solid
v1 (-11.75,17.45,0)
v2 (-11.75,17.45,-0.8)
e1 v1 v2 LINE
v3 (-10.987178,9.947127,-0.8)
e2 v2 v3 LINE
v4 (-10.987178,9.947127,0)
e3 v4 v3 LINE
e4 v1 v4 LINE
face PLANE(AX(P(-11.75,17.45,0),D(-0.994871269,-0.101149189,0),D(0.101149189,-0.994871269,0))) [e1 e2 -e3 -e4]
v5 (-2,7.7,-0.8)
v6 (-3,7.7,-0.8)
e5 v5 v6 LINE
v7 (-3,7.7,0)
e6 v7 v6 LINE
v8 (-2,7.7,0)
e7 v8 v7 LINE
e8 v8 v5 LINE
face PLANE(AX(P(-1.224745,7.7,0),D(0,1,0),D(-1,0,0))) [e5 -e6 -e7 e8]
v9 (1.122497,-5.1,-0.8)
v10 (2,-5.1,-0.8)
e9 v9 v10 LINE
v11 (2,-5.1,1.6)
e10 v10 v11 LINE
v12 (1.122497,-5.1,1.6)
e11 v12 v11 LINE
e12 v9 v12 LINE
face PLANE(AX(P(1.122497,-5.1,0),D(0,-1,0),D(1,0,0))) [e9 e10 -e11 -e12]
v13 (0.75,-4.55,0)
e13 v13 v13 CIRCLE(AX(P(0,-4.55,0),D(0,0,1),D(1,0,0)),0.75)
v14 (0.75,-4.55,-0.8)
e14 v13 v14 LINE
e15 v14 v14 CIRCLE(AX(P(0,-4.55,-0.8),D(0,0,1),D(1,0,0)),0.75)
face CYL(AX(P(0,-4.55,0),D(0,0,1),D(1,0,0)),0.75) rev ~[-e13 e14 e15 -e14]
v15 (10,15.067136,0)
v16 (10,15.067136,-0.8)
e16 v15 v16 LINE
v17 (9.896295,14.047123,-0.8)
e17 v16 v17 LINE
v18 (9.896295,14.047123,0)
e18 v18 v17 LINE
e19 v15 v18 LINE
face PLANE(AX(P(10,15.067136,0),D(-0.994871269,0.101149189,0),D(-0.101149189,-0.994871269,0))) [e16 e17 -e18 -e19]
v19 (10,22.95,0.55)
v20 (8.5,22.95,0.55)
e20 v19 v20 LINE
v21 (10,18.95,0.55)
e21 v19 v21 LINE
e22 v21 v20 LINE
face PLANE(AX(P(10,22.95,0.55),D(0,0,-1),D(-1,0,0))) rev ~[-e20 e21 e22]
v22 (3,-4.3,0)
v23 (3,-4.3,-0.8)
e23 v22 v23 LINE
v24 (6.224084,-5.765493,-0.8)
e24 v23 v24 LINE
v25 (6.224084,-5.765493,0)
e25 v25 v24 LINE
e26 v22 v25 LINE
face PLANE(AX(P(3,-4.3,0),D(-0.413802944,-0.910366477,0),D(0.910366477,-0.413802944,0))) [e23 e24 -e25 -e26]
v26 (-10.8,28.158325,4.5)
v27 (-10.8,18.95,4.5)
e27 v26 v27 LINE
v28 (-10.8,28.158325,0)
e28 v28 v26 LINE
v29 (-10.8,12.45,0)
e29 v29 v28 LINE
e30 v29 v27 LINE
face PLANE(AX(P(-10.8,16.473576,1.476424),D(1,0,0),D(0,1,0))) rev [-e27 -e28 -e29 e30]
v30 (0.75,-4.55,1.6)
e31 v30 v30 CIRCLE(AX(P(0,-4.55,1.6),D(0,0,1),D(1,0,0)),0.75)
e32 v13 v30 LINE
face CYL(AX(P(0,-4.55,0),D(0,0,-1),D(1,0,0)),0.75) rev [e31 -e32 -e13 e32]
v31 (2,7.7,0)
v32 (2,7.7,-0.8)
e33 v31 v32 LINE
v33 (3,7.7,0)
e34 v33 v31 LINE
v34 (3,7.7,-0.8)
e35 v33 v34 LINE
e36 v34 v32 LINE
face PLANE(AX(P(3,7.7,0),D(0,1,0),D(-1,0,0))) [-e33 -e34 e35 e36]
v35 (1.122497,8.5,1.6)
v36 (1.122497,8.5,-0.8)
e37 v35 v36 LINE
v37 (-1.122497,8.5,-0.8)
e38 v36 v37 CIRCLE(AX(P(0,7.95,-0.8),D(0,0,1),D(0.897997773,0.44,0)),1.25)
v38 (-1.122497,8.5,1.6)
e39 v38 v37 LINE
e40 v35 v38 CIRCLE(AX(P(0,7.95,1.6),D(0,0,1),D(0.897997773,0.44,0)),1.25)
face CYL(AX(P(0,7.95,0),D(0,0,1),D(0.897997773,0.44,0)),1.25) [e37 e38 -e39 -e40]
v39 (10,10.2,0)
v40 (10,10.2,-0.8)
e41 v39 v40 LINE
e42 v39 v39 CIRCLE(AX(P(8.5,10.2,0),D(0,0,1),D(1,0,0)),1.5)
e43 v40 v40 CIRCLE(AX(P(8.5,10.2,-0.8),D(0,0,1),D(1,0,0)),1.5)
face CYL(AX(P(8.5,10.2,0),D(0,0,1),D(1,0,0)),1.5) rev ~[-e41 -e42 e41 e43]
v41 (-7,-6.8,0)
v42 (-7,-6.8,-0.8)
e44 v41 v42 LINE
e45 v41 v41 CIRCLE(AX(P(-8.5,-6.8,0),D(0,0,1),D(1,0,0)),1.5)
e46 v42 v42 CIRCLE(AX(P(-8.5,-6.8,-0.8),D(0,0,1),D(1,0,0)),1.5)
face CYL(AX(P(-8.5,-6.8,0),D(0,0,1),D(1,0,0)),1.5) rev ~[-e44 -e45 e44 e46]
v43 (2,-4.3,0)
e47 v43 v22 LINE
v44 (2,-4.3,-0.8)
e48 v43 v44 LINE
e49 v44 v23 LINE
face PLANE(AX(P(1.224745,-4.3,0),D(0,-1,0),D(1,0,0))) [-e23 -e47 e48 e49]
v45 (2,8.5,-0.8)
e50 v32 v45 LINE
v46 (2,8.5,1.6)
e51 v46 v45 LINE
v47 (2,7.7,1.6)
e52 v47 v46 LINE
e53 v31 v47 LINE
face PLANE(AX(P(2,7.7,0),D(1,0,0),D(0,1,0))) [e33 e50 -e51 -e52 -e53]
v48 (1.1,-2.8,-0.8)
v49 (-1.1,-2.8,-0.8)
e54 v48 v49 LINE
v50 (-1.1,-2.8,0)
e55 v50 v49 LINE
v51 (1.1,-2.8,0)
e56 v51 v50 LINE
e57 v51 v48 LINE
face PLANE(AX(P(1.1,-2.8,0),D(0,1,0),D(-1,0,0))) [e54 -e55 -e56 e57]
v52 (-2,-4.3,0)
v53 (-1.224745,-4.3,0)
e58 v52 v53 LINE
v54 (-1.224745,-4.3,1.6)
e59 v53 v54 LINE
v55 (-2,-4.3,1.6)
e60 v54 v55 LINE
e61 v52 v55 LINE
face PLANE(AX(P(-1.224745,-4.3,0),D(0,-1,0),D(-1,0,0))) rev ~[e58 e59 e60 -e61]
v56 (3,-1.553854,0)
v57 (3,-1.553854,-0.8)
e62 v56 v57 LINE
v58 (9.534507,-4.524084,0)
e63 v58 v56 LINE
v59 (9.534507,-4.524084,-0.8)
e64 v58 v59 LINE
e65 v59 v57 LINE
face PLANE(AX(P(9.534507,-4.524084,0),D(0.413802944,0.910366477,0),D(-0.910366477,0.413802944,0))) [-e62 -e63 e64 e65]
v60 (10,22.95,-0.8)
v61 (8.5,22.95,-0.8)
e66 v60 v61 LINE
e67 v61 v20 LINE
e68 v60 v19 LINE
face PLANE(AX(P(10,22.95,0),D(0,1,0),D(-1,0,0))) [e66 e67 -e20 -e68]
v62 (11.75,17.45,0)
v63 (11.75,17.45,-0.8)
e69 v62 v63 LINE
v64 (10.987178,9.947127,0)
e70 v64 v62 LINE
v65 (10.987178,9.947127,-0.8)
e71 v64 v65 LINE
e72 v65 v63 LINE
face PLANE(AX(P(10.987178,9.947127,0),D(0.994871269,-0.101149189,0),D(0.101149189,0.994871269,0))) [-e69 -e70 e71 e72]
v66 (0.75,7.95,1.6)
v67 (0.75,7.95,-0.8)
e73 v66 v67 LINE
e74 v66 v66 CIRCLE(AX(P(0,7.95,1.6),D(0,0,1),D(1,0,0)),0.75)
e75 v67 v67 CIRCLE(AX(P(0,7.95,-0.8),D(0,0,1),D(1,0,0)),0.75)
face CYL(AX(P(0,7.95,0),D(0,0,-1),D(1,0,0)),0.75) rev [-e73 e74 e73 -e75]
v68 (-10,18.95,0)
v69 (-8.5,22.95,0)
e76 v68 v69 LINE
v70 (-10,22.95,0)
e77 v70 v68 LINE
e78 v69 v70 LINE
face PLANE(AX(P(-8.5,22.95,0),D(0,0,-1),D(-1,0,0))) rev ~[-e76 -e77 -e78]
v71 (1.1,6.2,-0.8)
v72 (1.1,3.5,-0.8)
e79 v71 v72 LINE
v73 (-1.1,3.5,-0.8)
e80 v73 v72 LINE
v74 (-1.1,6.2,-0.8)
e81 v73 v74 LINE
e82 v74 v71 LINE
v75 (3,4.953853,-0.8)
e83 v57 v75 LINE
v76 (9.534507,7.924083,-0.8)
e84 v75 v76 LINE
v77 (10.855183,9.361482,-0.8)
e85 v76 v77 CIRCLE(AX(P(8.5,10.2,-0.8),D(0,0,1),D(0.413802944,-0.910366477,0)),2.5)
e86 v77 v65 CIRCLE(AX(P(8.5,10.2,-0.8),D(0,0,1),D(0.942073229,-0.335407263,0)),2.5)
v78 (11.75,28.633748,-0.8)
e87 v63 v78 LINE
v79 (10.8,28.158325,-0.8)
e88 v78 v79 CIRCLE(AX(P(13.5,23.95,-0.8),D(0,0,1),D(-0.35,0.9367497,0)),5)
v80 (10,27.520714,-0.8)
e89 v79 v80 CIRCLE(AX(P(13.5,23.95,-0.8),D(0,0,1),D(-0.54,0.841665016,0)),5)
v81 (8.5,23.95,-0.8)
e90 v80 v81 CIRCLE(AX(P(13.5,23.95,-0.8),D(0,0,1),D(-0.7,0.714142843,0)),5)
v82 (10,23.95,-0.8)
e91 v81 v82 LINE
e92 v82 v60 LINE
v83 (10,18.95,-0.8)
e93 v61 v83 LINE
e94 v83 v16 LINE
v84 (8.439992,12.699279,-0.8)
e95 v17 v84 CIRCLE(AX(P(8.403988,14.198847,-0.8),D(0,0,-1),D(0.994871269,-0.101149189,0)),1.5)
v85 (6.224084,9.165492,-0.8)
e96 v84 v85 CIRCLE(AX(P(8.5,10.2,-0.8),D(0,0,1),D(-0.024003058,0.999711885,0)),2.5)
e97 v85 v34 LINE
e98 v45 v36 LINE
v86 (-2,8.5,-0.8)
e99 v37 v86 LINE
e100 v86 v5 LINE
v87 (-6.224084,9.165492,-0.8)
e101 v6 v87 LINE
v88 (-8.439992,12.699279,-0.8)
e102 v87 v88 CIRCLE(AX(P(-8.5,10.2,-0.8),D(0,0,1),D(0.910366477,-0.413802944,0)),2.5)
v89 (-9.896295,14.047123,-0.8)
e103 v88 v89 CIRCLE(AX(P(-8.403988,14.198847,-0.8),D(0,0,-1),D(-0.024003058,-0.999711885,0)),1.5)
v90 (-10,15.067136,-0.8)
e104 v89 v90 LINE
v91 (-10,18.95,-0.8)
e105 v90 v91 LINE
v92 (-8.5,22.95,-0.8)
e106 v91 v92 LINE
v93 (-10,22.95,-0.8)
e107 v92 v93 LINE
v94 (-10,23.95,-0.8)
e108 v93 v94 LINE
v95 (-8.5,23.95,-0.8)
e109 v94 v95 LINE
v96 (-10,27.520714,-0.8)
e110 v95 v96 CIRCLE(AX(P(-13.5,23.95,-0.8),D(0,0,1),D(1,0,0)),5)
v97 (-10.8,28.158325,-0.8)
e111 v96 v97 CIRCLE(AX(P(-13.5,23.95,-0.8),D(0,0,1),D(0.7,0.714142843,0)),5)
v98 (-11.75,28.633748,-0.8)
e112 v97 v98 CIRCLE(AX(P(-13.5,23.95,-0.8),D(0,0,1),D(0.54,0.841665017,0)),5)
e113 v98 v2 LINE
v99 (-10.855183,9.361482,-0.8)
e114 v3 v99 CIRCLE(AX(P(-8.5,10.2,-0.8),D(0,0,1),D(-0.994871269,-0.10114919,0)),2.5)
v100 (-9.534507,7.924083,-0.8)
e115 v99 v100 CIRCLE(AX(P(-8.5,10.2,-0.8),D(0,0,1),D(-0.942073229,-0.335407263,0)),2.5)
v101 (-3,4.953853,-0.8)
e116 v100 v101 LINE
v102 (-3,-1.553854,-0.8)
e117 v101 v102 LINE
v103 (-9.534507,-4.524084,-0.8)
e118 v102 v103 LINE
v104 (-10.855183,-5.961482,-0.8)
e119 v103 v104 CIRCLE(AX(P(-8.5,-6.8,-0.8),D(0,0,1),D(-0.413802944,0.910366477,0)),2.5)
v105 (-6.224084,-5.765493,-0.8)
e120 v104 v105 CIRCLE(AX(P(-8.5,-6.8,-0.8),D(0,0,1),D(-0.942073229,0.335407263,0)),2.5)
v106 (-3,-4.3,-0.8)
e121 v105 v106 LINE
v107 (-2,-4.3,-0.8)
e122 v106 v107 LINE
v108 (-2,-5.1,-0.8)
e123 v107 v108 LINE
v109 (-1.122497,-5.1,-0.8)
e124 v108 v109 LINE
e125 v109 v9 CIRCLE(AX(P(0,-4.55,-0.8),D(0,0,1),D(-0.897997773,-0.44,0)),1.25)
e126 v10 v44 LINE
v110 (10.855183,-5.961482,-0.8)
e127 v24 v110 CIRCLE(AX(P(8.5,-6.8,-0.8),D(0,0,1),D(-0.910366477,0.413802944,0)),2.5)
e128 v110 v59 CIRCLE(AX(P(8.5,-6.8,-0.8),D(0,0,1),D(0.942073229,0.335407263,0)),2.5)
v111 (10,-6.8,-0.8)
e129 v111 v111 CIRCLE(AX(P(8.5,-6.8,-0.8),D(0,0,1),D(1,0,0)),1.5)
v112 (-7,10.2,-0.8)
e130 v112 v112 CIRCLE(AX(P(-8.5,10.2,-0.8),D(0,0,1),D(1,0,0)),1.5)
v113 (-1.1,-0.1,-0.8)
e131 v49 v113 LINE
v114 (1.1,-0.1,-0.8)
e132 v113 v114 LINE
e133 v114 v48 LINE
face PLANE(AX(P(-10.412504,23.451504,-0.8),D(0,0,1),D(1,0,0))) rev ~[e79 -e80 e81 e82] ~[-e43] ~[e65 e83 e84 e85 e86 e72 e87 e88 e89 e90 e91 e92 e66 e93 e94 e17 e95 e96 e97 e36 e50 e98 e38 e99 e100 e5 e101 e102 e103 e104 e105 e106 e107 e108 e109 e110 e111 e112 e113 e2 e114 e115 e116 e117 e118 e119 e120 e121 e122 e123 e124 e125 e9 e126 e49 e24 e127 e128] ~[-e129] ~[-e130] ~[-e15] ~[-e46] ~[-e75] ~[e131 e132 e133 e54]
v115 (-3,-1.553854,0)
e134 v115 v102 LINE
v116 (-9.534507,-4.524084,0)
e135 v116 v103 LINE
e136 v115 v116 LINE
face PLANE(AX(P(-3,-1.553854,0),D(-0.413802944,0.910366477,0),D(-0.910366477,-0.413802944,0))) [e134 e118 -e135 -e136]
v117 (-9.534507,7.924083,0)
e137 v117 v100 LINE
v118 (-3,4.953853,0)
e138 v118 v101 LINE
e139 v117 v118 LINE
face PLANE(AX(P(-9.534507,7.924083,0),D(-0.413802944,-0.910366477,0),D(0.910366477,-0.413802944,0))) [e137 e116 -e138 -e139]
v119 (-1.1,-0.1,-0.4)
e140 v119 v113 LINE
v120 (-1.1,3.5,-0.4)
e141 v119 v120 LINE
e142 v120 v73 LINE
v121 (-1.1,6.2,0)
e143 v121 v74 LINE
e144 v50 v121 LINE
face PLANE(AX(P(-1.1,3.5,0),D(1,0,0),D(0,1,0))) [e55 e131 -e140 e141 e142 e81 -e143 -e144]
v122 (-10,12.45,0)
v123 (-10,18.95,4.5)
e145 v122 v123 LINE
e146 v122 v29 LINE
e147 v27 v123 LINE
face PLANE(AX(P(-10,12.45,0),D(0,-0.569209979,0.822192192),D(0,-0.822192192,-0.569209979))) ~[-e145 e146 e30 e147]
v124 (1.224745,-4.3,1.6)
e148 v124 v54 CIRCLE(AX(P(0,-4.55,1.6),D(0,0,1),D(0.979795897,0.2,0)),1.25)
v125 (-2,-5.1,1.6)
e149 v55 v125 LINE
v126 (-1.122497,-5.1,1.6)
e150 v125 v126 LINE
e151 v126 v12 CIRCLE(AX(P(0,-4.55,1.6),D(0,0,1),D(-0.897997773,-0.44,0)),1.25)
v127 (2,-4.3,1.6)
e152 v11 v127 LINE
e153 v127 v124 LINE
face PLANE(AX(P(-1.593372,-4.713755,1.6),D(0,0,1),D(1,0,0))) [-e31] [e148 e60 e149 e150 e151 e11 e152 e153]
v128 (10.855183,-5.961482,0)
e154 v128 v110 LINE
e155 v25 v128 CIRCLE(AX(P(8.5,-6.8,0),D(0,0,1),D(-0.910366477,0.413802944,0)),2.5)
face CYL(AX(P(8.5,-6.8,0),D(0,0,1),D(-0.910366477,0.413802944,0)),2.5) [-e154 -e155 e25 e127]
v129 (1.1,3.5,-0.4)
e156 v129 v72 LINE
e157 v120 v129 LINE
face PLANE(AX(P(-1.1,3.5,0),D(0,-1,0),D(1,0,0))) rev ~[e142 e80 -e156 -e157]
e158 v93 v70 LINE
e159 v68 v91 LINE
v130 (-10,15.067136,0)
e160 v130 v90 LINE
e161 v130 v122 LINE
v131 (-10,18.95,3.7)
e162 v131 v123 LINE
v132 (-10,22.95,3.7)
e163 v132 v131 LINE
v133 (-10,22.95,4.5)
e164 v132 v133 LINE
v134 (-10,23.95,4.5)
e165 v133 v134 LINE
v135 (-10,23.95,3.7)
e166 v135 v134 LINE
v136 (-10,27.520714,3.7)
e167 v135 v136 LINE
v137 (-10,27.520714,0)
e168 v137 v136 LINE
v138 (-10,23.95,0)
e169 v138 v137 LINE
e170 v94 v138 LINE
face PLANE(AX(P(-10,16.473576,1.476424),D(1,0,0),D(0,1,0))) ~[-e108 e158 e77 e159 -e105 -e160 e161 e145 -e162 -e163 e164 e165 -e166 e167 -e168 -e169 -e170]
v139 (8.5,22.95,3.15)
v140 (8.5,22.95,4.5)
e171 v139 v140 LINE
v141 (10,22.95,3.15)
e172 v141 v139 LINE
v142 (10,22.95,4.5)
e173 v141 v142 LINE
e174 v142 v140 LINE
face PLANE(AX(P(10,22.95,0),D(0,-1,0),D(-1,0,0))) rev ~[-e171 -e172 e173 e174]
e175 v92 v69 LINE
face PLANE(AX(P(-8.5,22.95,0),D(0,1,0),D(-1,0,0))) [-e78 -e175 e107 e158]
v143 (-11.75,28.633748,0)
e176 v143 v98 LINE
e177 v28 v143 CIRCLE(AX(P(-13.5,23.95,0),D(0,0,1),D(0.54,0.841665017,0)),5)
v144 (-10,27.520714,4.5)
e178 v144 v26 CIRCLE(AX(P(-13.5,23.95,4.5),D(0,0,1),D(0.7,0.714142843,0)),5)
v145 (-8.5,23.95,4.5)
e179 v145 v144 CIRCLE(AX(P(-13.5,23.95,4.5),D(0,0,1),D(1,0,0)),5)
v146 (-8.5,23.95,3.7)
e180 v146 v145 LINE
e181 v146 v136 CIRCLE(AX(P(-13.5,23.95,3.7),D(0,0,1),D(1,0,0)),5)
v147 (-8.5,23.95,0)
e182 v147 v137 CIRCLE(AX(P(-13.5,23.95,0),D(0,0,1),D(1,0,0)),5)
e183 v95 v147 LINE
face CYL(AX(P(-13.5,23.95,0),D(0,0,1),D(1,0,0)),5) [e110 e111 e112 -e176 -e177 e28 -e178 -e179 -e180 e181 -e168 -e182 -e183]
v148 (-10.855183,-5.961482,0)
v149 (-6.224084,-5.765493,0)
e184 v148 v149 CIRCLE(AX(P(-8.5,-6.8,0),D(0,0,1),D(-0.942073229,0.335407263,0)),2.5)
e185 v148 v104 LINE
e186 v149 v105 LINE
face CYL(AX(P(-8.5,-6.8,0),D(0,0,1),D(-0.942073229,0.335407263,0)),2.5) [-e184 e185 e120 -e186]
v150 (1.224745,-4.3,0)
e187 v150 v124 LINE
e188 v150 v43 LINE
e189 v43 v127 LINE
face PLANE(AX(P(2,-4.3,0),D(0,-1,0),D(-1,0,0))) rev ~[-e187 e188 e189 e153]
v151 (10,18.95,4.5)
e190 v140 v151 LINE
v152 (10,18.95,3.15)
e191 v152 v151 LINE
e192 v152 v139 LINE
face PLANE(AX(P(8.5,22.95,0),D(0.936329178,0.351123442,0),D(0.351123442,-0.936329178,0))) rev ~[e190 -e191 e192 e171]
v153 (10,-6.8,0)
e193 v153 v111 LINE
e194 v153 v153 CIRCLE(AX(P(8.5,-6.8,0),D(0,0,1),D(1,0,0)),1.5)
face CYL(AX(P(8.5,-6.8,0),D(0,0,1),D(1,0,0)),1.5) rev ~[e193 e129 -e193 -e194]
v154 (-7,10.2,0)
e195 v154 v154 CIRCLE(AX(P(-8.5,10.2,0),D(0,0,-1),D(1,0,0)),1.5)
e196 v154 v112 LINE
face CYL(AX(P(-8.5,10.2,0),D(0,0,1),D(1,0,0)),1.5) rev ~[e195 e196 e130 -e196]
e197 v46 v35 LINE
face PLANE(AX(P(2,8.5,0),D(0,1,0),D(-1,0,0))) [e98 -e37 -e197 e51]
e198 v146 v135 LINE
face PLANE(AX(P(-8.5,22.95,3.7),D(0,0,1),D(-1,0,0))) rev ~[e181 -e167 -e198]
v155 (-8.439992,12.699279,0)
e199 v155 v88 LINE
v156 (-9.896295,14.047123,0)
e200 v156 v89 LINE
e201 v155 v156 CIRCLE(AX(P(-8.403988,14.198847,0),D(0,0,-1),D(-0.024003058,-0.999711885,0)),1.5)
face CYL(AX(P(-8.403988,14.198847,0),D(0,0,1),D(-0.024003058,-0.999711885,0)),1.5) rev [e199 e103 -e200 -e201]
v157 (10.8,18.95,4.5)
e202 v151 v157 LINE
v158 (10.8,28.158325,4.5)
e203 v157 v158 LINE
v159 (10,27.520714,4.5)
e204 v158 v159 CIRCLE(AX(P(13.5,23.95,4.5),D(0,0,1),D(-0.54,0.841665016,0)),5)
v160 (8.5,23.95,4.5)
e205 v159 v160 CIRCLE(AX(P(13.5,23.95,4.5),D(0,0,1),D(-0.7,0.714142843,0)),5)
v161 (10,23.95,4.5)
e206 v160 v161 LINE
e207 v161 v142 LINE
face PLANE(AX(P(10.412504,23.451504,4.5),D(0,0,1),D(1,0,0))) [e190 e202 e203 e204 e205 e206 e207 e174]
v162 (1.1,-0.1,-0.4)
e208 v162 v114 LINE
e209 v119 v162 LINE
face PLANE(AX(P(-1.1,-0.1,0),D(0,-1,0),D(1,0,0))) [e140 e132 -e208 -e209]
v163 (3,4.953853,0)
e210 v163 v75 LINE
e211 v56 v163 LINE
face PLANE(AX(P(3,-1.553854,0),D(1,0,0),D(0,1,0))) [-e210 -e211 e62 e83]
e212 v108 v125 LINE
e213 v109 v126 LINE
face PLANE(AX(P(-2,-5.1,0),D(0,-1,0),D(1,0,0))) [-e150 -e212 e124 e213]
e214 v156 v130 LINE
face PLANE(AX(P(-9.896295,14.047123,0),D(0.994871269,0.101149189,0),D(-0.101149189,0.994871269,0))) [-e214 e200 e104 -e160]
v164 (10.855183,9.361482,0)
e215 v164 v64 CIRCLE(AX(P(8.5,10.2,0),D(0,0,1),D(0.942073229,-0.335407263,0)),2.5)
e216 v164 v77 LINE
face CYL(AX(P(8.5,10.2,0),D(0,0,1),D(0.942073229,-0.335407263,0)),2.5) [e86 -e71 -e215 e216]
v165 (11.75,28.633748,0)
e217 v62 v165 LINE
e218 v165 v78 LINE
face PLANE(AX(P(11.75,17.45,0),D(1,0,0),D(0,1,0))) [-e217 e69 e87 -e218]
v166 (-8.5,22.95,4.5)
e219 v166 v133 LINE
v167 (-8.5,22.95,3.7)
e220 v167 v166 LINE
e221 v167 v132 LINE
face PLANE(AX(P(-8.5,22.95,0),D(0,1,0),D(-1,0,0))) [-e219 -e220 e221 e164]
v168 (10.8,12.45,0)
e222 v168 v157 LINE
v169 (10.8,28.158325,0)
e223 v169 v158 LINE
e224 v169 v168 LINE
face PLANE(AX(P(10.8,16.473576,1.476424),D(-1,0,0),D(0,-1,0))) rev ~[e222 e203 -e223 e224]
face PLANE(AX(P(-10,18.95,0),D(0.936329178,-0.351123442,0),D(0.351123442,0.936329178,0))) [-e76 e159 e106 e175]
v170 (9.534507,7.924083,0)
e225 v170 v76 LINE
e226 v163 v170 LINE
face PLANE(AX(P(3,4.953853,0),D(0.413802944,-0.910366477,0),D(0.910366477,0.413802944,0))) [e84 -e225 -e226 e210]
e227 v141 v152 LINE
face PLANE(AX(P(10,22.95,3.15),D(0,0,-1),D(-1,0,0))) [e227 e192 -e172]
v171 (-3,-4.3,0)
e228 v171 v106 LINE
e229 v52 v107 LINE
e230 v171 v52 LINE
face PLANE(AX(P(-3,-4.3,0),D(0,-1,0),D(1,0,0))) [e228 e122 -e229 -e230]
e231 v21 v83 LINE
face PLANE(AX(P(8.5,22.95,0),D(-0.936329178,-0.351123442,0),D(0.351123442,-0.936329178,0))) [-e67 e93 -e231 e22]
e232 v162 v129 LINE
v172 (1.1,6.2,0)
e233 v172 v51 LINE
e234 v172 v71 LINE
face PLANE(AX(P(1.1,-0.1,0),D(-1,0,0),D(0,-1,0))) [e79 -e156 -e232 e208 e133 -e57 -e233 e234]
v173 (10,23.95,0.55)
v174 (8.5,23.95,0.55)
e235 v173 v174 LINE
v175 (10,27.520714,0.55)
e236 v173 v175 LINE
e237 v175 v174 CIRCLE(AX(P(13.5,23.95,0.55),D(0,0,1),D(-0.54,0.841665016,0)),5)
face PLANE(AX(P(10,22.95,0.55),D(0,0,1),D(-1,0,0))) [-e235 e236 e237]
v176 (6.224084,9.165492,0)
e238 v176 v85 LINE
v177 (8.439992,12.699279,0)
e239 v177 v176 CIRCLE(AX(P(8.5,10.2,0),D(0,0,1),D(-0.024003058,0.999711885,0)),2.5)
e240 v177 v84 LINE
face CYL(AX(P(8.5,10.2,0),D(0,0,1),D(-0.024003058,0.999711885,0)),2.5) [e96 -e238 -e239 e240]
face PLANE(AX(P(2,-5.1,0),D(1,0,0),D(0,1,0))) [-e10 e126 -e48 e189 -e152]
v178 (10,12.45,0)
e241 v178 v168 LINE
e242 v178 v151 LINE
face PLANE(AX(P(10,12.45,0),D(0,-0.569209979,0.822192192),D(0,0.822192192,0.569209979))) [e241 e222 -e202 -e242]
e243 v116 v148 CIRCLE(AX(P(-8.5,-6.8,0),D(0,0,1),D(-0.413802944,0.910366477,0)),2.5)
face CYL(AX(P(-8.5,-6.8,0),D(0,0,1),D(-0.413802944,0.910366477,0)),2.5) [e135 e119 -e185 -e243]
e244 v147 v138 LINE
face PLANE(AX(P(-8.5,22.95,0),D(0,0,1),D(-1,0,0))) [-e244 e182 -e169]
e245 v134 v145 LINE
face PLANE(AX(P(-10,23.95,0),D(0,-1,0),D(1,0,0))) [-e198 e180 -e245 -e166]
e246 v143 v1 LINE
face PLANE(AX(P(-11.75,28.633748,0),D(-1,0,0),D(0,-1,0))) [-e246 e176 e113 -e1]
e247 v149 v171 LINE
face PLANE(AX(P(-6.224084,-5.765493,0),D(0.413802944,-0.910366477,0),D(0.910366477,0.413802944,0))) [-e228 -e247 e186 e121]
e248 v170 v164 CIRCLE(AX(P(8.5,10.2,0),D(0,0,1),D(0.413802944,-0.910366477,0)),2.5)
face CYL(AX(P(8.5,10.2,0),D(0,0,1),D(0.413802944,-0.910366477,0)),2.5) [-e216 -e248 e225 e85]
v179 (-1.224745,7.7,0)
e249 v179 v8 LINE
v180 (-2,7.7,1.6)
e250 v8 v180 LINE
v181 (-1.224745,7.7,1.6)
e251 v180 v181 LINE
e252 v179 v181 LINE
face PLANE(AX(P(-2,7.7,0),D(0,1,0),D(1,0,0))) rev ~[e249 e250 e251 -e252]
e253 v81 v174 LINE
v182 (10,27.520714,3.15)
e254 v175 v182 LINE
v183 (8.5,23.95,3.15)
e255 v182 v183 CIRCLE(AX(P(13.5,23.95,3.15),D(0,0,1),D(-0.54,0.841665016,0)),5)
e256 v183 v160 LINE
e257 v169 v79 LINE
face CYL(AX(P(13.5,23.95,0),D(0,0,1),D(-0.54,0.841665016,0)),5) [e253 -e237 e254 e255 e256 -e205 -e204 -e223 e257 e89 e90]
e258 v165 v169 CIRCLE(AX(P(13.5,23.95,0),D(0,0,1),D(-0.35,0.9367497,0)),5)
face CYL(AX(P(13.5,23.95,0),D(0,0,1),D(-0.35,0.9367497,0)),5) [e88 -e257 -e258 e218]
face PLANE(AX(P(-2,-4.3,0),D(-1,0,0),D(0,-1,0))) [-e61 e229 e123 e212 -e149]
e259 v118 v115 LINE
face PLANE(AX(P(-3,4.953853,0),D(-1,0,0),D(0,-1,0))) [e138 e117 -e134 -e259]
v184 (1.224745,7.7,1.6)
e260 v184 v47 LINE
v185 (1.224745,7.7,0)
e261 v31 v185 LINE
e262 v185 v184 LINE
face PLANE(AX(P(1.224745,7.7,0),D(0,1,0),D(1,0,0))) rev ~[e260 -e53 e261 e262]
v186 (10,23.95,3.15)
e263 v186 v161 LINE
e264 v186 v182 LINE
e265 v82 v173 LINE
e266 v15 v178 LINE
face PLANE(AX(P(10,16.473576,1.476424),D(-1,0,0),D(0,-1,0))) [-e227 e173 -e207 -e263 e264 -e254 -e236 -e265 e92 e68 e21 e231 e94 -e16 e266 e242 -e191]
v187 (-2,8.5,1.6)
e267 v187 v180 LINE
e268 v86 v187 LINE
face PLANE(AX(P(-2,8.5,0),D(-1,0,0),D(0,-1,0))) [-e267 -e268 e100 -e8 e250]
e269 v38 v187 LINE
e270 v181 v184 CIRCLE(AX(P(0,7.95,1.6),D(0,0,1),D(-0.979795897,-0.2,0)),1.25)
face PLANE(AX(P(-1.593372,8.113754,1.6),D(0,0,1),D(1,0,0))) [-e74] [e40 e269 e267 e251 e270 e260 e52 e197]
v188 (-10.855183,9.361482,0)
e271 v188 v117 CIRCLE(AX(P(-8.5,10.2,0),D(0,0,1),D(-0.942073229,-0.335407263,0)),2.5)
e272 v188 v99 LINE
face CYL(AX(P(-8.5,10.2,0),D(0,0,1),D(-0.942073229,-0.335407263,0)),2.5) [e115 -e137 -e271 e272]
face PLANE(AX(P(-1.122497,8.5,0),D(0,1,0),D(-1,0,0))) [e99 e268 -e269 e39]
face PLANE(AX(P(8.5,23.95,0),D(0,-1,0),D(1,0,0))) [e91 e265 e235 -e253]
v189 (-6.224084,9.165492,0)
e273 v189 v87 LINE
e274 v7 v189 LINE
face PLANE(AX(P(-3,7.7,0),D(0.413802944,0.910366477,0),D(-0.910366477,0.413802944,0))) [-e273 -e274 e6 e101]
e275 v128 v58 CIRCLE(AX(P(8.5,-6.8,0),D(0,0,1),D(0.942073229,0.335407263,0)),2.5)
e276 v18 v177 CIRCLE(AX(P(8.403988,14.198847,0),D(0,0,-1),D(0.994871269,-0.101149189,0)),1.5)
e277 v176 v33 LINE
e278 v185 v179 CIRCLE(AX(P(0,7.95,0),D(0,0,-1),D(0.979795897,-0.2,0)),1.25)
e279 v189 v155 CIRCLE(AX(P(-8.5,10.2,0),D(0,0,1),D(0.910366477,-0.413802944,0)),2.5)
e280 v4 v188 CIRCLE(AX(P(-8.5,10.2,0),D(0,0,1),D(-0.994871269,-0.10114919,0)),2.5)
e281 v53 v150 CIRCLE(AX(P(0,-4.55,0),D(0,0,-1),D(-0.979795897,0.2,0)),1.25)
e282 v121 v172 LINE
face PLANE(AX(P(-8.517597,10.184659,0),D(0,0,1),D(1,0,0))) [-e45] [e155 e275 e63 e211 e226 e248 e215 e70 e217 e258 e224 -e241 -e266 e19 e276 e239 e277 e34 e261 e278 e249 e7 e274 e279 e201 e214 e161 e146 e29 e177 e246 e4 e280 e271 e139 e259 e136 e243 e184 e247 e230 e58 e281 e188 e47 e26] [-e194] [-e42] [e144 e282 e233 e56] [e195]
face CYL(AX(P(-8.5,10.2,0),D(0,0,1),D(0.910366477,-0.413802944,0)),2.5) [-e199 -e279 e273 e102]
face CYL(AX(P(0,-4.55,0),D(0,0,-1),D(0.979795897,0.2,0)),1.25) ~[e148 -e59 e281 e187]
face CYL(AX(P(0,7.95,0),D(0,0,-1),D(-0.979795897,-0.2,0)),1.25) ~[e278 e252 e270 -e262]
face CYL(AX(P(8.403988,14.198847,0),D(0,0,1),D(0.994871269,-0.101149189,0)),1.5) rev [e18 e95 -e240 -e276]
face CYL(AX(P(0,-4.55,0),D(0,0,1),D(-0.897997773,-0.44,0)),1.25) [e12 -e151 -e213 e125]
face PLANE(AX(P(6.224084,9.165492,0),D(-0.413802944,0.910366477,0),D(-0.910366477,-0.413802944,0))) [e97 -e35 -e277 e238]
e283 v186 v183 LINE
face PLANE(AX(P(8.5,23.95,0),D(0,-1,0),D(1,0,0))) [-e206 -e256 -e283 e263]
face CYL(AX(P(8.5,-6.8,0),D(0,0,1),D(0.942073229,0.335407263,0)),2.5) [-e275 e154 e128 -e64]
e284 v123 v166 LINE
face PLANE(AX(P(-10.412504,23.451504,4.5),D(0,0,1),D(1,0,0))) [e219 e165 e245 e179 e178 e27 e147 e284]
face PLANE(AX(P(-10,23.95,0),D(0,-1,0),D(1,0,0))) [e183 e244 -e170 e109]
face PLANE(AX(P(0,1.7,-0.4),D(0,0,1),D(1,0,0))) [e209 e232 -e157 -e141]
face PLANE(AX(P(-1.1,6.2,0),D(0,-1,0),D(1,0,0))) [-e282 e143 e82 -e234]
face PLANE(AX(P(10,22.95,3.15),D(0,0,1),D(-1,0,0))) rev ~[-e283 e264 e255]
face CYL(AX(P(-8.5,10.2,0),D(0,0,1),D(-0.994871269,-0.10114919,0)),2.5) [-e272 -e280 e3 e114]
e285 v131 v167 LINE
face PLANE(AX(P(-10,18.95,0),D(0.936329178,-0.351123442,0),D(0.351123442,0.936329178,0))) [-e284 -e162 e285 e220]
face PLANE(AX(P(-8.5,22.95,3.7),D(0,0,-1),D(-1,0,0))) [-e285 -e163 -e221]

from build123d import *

# Parameters (mm, degrees)
F0_W          = 2.2
F0_H          = 3.6
F1_DEPTH      = 0.8
F0_R          = 0.75
F2_DEPTH      = 1.6
F2_DEPTH_BACK = 0.8
F3_DEPTH      = 0.4
F0_R_2        = 1.5
F4_DEPTH      = 0.8
F5_DEPTH      = 4.5
F5_DEPTH_BACK = 0.8
F6_W          = 1.5
F6_H          = 3.7
F6_H_2        = 2.6
F7_DEPTH      = 25
F7_DEPTH_BACK = 25
F9_DEPTH      = 0.8


# Not quite as in the source:
# - a feature of the source that left no trace in its solid (it failed there, or was rolled back) is left out
# - a pattern or mirror of a feature is missing from the dataset's text; its kind, count and spacing are read off the source's solid


with BuildPart() as f1:
    # F0 (on Top) → F1 (new body)
    with BuildSketch(Plane.XY):
        with BuildLine():
            Line((2, 7.6999996733), (1.2247448714, 7.6999996733))
            ThreePointArc((1.2247448714, 7.6999996733), (0, 6.6999996733), (-1.2247448714, 7.6999996733))
            Line((-1.2247448714, 7.6999996733), (-2, 7.6999996733))
            Line((-2, 7.6999996733), (-3, 7.6999996733))
            Line((-3, 7.6999996733), (-6.2240838063, 9.1654923125))
            ThreePointArc((-6.2240838063, 9.1654923125), (-7.622191396, 7.8591767294), (-9.5345073608, 7.9240834796))
            Line((-9.5345073608, 7.9240834796), (-3, 4.9538528611))
            Line((-3, 4.9538528611), (-3, -1.5538535145))
            Line((-3, -1.5538535145), (-9.5345073608, -4.5240841331))
            ThreePointArc((-9.5345073608, -4.5240841331), (-7.622191396, -4.4591773828), (-6.2240838063, -5.765492966))
            Line((-6.2240838063, -5.765492966), (-3, -4.3000003267))
            Line((-3, -4.3000003267), (-2, -4.3000003267))
            Line((-2, -4.3000003267), (-1.2247448714, -4.3000003267))
            ThreePointArc((-1.2247448714, -4.3000003267), (0, -3.3000003267), (1.2247448714, -4.3000003267))
            Line((1.2247448714, -4.3000003267), (2, -4.3000003267))
            Line((2, -4.3000003267), (3, -4.3000003267))
            Line((3, -4.3000003267), (6.2240838063, -5.765492966))
            ThreePointArc((6.2240838063, -5.765492966), (7.622191396, -4.4591773828), (9.5345073608, -4.5240841331))
            Line((9.5345073608, -4.5240841331), (3, -1.5538535145))
            Line((3, -1.5538535145), (3, 4.9538528611))
            Line((3, 4.9538528611), (9.5345073608, 7.9240834796))
            ThreePointArc((9.5345073608, 7.9240834796), (7.622191396, 7.8591767294), (6.2240838063, 9.1654923125))
            Line((6.2240838063, 9.1654923125), (3, 7.6999996733))
            Line((3, 7.6999996733), (2, 7.6999996733))
        make_face()
        Polygon((-1.1, 3.4999996733), (-1.1, 6.1999996733), (1.1, 6.1999996733), (1.1, 3.4999996733), (1.1, -0.1000003267), (1.1, -2.8000003267), (-1.1, -2.8000003267), (-1.1, -0.1000003267), align=None, mode=Mode.SUBTRACT)
        with Locations((0, 1.6999996733)):
            Rectangle(F0_W, F0_H)
    extrude(amount=-F1_DEPTH)

    # F0 (on Top) → F2 (join, two sides)
    with BuildSketch(Plane.XY) as f2_sk:
        with BuildLine():
            ThreePointArc((-1.2247448714, 7.6999996733), (-1.2399138495, 8.1084725282), (-1.122497216, 8.4999996733))
            Line((-1.122497216, 8.4999996733), (-2, 8.4999996733))
            Line((-2, 8.4999996733), (-2, 7.6999996733))
            Line((-2, 7.6999996733), (-1.2247448714, 7.6999996733))
        make_face()
        with BuildLine():
            ThreePointArc((1.2247448714, 7.6999996733), (1.2436701913, 7.8243634708), (1.25, 7.9499996733))
            ThreePointArc((1.25, 7.9499996733), (1.2177071733, 8.2322924999), (1.122497216, 8.4999996733))
            ThreePointArc((1.122497216, 8.4999996733), (0, 9.1999996733), (-1.122497216, 8.4999996733))
            ThreePointArc((-1.122497216, 8.4999996733), (-1.2399138495, 8.1084725282), (-1.2247448714, 7.6999996733))
            ThreePointArc((-1.2247448714, 7.6999996733), (0, 6.6999996733), (1.2247448714, 7.6999996733))
        make_face()
        with Locations((0, 7.9499996733)):
            Circle(F0_R, mode=Mode.SUBTRACT)
        with BuildLine():
            ThreePointArc((1.122497216, 8.4999996733), (1.2177071733, 8.2322924999), (1.25, 7.9499996733))
            ThreePointArc((1.25, 7.9499996733), (1.2436701913, 7.8243634708), (1.2247448714, 7.6999996733))
            Line((1.2247448714, 7.6999996733), (2, 7.6999996733))
            Line((2, 7.6999996733), (2, 8.4999996733))
            Line((2, 8.4999996733), (1.122497216, 8.4999996733))
        make_face()
        with BuildLine():
            Line((-1.2247448714, -4.3000003267), (-2, -4.3000003267))
            Line((-2, -4.3000003267), (-2, -5.1000003267))
            Line((-2, -5.1000003267), (-1.122497216, -5.1000003267))
            ThreePointArc((-1.122497216, -5.1000003267), (-1.2399138495, -4.7084731817), (-1.2247448714, -4.3000003267))
        make_face()
        with BuildLine():
            ThreePointArc((1.25, -4.5500003267), (1.2436701913, -4.4243641242), (1.2247448714, -4.3000003267))
            ThreePointArc((1.2247448714, -4.3000003267), (0, -3.3000003267), (-1.2247448714, -4.3000003267))
            ThreePointArc((-1.2247448714, -4.3000003267), (-1.2399138495, -4.7084731817), (-1.122497216, -5.1000003267))
            ThreePointArc((-1.122497216, -5.1000003267), (0, -5.8000003267), (1.122497216, -5.1000003267))
            ThreePointArc((1.122497216, -5.1000003267), (1.2177071733, -4.8322931534), (1.25, -4.5500003267))
        make_face()
        with Locations((0, -4.5500003267)):
            Circle(F0_R, mode=Mode.SUBTRACT)
        with BuildLine():
            Line((2, -5.1000003267), (2, -4.3000003267))
            Line((2, -4.3000003267), (1.2247448714, -4.3000003267))
            ThreePointArc((1.2247448714, -4.3000003267), (1.2436701913, -4.4243641242), (1.25, -4.5500003267))
            ThreePointArc((1.25, -4.5500003267), (1.2177071733, -4.8322931534), (1.122497216, -5.1000003267))
            Line((1.122497216, -5.1000003267), (2, -5.1000003267))
        make_face()
    extrude(amount=F2_DEPTH)
    extrude(f2_sk.sketch, amount=-F2_DEPTH_BACK)

    # F0 (on Top) → F3 (cut)
    with BuildSketch(Plane.XY):
        with Locations((0, 1.6999996733)):
            Rectangle(F0_W, F0_H)
    extrude(amount=-F3_DEPTH, mode=Mode.SUBTRACT)

    # F0 (on Top) → F4 (join)
    with BuildSketch(Plane.XY):
        with BuildLine():
            ThreePointArc((-9.5345073608, 7.9240834796), (-7.622191396, 7.8591767294), (-6.2240838063, 9.1654923125))
            ThreePointArc((-6.2240838063, 9.1654923125), (-6.3819707707, 11.5281382895), (-8.4399923541, 12.699279386))
            ThreePointArc((-8.4399923541, 12.699279386), (-10.3347684576, 11.8981235519), (-10.987178172, 9.9471266996))
            ThreePointArc((-10.987178172, 9.9471266996), (-10.9388236249, 9.6503276559), (-10.8551830715, 9.3614815161))
            ThreePointArc((-10.8551830715, 9.3614815161), (-10.3409314451, 8.5085590404), (-9.5345073608, 7.9240834796))
        make_face()
        with Locations((-8.5, 10.1999996733)):
            Circle(F0_R_2, mode=Mode.SUBTRACT)
        with BuildLine():
            ThreePointArc((8.4399923541, 12.699279386), (6.3819707707, 11.5281382895), (6.2240838063, 9.1654923125))
            ThreePointArc((6.2240838063, 9.1654923125), (7.622191396, 7.8591767294), (9.5345073608, 7.9240834796))
            ThreePointArc((9.5345073608, 7.9240834796), (10.3409314451, 8.5085590404), (10.8551830715, 9.3614815161))
            ThreePointArc((10.8551830715, 9.3614815161), (10.9388236249, 9.6503276559), (10.987178172, 9.9471266996))
            ThreePointArc((10.987178172, 9.9471266996), (10.3347684576, 11.8981235519), (8.4399923541, 12.699279386))
        make_face()
        with Locations((8.5, 10.1999996733)):
            Circle(F0_R_2, mode=Mode.SUBTRACT)
        with BuildLine():
            ThreePointArc((-6.2240838063, -5.765492966), (-7.622191396, -4.4591773828), (-9.5345073608, -4.5240841331))
            ThreePointArc((-9.5345073608, -4.5240841331), (-10.3409314451, -5.1085596938), (-10.8551830715, -5.9614821695))
            ThreePointArc((-10.8551830715, -5.9614821695), (-8.394294033, -9.2977645767), (-6.2240838063, -5.765492966))
        make_face()
        with Locations((-8.5, -6.8000003267)):
            Circle(F0_R_2, mode=Mode.SUBTRACT)
        with BuildLine():
            ThreePointArc((10.8551830715, -5.9614821695), (10.3409314451, -5.1085596938), (9.5345073608, -4.5240841331))
            ThreePointArc((9.5345073608, -4.5240841331), (7.622191396, -4.4591773828), (6.2240838063, -5.765492966))
            ThreePointArc((6.2240838063, -5.765492966), (8.394294033, -9.2977645767), (10.8551830715, -5.9614821695))
        make_face()
        with Locations((8.5, -6.8000003267)):
            Circle(F0_R_2, mode=Mode.SUBTRACT)
        with BuildLine():
            ThreePointArc((-10.987178172, 9.9471266996), (-10.3347684576, 11.8981235519), (-8.4399923541, 12.699279386))
            ThreePointArc((-8.4399923541, 12.699279386), (-9.4228620937, 13.0979861391), (-9.8962946697, 14.0471234295))
            Line((-9.8962946697, 14.0471234295), (-10, 15.0671360866))
            Line((-10, 15.0671360866), (-10, 18.9499996733))
            Line((-10, 18.9499996733), (-10.8, 18.9499996733))
            Line((-10.8, 18.9499996733), (-10.8, 28.1583247558))
            ThreePointArc((-10.8, 28.1583247558), (-11.2623378592, 28.4213381914), (-11.75, 28.6337481721))
            Line((-11.75, 28.6337481721), (-11.75, 17.4499996733))
            Line((-11.75, 17.4499996733), (-10.987178172, 9.9471266996))
        make_face()
        with BuildLine():
            ThreePointArc((9.8962946697, 14.0471234295), (9.4228620937, 13.0979861391), (8.4399923541, 12.699279386))
            ThreePointArc((8.4399923541, 12.699279386), (10.3347684576, 11.8981235519), (10.987178172, 9.9471266996))
            Line((10.987178172, 9.9471266996), (11.75, 17.4499996733))
            Line((11.75, 17.4499996733), (11.75, 28.6337481721))
            ThreePointArc((11.75, 28.6337481721), (11.2623378592, 28.4213381914), (10.8, 28.1583247558))
            Line((10.8, 28.1583247558), (10.8, 18.9499996733))
            Line((10.8, 18.9499996733), (10, 18.9499996733))
            Line((10, 18.9499996733), (10, 15.0671360866))
            Line((10, 15.0671360866), (9.8962946697, 14.0471234295))
        make_face()
    extrude(amount=-F4_DEPTH)

    # F0 (on Top) → F5 (join, two sides)
    with BuildSketch(Plane.XY) as f5_sk:
        with BuildLine():
            Line((-10.8, 18.9499996733), (-10, 18.9499996733))
            Line((-10, 18.9499996733), (-10, 22.9499996733))
            Line((-10, 22.9499996733), (-10, 23.9499996733))
            Line((-10, 23.9499996733), (-10, 27.5207138876))
            ThreePointArc((-10, 27.5207138876), (-10.383650067, 27.860033317), (-10.8, 28.1583247558))
            Line((-10.8, 28.1583247558), (-10.8, 18.9499996733))
        make_face()
        Polygon((-10, 22.9499996733), (-10, 18.9499996733), (-8.5, 22.9499996733), align=None)
        with BuildLine():
            ThreePointArc((-8.5, 23.9499996733), (-8.8902277714, 25.8864913464), (-10, 27.5207138876))
            Line((-10, 27.5207138876), (-10, 23.9499996733))
            Line((-10, 23.9499996733), (-8.5, 23.9499996733))
        make_face()
        with BuildLine():
            Line((10, 22.9499996733), (10, 18.9499996733))
            Line((10, 18.9499996733), (10.8, 18.9499996733))
            Line((10.8, 18.9499996733), (10.8, 28.1583247558))
            ThreePointArc((10.8, 28.1583247558), (10.383650067, 27.860033317), (10, 27.5207138876))
            Line((10, 27.5207138876), (10, 23.9499996733))
            Line((10, 23.9499996733), (10, 22.9499996733))
        make_face()
        Polygon((8.5, 22.9499996733), (10, 18.9499996733), (10, 22.9499996733), align=None)
        with BuildLine():
            Line((10, 23.9499996733), (10, 27.5207138876))
            ThreePointArc((10, 27.5207138876), (8.8902277714, 25.8864913464), (8.5, 23.9499996733))
            Line((8.5, 23.9499996733), (10, 23.9499996733))
        make_face()
    extrude(amount=F5_DEPTH)
    extrude(f5_sk.sketch, amount=-F5_DEPTH_BACK)

    # F6 (on face) → F7 (cut, two sides)
    with BuildSketch(Plane(origin=(0, 22.9499996733, 0), x_dir=(-1, 0, 0), z_dir=(0, 1, 0))) as f7_sk:
        with Locations((9.25, 1.85)):
            Rectangle(F6_W, F6_H)
        with Locations((-9.25, 1.85)):
            Rectangle(F6_W, F6_H_2)
    extrude(amount=-F7_DEPTH, mode=Mode.SUBTRACT)
    extrude(f7_sk.sketch, amount=F7_DEPTH_BACK, mode=Mode.SUBTRACT)

    # F8 (on face) → F9 (join)
    with BuildSketch(Plane(origin=(10, 0, 0), x_dir=(0, -1, 0), z_dir=(-1, 0, 0))):
        Polygon((-12.4499996733, 0), (-18.9499996733, 4.5), (-18.9499996733, 0), align=None)
    f9 = extrude(amount=-F9_DEPTH)

    # F9_copies: F9 across plane
    add(f9.mirror(Plane(origin=(0, 0, 0), x_dir=(0, 0, -1), z_dir=(-1, 0, 0))))


solid = f1.part
